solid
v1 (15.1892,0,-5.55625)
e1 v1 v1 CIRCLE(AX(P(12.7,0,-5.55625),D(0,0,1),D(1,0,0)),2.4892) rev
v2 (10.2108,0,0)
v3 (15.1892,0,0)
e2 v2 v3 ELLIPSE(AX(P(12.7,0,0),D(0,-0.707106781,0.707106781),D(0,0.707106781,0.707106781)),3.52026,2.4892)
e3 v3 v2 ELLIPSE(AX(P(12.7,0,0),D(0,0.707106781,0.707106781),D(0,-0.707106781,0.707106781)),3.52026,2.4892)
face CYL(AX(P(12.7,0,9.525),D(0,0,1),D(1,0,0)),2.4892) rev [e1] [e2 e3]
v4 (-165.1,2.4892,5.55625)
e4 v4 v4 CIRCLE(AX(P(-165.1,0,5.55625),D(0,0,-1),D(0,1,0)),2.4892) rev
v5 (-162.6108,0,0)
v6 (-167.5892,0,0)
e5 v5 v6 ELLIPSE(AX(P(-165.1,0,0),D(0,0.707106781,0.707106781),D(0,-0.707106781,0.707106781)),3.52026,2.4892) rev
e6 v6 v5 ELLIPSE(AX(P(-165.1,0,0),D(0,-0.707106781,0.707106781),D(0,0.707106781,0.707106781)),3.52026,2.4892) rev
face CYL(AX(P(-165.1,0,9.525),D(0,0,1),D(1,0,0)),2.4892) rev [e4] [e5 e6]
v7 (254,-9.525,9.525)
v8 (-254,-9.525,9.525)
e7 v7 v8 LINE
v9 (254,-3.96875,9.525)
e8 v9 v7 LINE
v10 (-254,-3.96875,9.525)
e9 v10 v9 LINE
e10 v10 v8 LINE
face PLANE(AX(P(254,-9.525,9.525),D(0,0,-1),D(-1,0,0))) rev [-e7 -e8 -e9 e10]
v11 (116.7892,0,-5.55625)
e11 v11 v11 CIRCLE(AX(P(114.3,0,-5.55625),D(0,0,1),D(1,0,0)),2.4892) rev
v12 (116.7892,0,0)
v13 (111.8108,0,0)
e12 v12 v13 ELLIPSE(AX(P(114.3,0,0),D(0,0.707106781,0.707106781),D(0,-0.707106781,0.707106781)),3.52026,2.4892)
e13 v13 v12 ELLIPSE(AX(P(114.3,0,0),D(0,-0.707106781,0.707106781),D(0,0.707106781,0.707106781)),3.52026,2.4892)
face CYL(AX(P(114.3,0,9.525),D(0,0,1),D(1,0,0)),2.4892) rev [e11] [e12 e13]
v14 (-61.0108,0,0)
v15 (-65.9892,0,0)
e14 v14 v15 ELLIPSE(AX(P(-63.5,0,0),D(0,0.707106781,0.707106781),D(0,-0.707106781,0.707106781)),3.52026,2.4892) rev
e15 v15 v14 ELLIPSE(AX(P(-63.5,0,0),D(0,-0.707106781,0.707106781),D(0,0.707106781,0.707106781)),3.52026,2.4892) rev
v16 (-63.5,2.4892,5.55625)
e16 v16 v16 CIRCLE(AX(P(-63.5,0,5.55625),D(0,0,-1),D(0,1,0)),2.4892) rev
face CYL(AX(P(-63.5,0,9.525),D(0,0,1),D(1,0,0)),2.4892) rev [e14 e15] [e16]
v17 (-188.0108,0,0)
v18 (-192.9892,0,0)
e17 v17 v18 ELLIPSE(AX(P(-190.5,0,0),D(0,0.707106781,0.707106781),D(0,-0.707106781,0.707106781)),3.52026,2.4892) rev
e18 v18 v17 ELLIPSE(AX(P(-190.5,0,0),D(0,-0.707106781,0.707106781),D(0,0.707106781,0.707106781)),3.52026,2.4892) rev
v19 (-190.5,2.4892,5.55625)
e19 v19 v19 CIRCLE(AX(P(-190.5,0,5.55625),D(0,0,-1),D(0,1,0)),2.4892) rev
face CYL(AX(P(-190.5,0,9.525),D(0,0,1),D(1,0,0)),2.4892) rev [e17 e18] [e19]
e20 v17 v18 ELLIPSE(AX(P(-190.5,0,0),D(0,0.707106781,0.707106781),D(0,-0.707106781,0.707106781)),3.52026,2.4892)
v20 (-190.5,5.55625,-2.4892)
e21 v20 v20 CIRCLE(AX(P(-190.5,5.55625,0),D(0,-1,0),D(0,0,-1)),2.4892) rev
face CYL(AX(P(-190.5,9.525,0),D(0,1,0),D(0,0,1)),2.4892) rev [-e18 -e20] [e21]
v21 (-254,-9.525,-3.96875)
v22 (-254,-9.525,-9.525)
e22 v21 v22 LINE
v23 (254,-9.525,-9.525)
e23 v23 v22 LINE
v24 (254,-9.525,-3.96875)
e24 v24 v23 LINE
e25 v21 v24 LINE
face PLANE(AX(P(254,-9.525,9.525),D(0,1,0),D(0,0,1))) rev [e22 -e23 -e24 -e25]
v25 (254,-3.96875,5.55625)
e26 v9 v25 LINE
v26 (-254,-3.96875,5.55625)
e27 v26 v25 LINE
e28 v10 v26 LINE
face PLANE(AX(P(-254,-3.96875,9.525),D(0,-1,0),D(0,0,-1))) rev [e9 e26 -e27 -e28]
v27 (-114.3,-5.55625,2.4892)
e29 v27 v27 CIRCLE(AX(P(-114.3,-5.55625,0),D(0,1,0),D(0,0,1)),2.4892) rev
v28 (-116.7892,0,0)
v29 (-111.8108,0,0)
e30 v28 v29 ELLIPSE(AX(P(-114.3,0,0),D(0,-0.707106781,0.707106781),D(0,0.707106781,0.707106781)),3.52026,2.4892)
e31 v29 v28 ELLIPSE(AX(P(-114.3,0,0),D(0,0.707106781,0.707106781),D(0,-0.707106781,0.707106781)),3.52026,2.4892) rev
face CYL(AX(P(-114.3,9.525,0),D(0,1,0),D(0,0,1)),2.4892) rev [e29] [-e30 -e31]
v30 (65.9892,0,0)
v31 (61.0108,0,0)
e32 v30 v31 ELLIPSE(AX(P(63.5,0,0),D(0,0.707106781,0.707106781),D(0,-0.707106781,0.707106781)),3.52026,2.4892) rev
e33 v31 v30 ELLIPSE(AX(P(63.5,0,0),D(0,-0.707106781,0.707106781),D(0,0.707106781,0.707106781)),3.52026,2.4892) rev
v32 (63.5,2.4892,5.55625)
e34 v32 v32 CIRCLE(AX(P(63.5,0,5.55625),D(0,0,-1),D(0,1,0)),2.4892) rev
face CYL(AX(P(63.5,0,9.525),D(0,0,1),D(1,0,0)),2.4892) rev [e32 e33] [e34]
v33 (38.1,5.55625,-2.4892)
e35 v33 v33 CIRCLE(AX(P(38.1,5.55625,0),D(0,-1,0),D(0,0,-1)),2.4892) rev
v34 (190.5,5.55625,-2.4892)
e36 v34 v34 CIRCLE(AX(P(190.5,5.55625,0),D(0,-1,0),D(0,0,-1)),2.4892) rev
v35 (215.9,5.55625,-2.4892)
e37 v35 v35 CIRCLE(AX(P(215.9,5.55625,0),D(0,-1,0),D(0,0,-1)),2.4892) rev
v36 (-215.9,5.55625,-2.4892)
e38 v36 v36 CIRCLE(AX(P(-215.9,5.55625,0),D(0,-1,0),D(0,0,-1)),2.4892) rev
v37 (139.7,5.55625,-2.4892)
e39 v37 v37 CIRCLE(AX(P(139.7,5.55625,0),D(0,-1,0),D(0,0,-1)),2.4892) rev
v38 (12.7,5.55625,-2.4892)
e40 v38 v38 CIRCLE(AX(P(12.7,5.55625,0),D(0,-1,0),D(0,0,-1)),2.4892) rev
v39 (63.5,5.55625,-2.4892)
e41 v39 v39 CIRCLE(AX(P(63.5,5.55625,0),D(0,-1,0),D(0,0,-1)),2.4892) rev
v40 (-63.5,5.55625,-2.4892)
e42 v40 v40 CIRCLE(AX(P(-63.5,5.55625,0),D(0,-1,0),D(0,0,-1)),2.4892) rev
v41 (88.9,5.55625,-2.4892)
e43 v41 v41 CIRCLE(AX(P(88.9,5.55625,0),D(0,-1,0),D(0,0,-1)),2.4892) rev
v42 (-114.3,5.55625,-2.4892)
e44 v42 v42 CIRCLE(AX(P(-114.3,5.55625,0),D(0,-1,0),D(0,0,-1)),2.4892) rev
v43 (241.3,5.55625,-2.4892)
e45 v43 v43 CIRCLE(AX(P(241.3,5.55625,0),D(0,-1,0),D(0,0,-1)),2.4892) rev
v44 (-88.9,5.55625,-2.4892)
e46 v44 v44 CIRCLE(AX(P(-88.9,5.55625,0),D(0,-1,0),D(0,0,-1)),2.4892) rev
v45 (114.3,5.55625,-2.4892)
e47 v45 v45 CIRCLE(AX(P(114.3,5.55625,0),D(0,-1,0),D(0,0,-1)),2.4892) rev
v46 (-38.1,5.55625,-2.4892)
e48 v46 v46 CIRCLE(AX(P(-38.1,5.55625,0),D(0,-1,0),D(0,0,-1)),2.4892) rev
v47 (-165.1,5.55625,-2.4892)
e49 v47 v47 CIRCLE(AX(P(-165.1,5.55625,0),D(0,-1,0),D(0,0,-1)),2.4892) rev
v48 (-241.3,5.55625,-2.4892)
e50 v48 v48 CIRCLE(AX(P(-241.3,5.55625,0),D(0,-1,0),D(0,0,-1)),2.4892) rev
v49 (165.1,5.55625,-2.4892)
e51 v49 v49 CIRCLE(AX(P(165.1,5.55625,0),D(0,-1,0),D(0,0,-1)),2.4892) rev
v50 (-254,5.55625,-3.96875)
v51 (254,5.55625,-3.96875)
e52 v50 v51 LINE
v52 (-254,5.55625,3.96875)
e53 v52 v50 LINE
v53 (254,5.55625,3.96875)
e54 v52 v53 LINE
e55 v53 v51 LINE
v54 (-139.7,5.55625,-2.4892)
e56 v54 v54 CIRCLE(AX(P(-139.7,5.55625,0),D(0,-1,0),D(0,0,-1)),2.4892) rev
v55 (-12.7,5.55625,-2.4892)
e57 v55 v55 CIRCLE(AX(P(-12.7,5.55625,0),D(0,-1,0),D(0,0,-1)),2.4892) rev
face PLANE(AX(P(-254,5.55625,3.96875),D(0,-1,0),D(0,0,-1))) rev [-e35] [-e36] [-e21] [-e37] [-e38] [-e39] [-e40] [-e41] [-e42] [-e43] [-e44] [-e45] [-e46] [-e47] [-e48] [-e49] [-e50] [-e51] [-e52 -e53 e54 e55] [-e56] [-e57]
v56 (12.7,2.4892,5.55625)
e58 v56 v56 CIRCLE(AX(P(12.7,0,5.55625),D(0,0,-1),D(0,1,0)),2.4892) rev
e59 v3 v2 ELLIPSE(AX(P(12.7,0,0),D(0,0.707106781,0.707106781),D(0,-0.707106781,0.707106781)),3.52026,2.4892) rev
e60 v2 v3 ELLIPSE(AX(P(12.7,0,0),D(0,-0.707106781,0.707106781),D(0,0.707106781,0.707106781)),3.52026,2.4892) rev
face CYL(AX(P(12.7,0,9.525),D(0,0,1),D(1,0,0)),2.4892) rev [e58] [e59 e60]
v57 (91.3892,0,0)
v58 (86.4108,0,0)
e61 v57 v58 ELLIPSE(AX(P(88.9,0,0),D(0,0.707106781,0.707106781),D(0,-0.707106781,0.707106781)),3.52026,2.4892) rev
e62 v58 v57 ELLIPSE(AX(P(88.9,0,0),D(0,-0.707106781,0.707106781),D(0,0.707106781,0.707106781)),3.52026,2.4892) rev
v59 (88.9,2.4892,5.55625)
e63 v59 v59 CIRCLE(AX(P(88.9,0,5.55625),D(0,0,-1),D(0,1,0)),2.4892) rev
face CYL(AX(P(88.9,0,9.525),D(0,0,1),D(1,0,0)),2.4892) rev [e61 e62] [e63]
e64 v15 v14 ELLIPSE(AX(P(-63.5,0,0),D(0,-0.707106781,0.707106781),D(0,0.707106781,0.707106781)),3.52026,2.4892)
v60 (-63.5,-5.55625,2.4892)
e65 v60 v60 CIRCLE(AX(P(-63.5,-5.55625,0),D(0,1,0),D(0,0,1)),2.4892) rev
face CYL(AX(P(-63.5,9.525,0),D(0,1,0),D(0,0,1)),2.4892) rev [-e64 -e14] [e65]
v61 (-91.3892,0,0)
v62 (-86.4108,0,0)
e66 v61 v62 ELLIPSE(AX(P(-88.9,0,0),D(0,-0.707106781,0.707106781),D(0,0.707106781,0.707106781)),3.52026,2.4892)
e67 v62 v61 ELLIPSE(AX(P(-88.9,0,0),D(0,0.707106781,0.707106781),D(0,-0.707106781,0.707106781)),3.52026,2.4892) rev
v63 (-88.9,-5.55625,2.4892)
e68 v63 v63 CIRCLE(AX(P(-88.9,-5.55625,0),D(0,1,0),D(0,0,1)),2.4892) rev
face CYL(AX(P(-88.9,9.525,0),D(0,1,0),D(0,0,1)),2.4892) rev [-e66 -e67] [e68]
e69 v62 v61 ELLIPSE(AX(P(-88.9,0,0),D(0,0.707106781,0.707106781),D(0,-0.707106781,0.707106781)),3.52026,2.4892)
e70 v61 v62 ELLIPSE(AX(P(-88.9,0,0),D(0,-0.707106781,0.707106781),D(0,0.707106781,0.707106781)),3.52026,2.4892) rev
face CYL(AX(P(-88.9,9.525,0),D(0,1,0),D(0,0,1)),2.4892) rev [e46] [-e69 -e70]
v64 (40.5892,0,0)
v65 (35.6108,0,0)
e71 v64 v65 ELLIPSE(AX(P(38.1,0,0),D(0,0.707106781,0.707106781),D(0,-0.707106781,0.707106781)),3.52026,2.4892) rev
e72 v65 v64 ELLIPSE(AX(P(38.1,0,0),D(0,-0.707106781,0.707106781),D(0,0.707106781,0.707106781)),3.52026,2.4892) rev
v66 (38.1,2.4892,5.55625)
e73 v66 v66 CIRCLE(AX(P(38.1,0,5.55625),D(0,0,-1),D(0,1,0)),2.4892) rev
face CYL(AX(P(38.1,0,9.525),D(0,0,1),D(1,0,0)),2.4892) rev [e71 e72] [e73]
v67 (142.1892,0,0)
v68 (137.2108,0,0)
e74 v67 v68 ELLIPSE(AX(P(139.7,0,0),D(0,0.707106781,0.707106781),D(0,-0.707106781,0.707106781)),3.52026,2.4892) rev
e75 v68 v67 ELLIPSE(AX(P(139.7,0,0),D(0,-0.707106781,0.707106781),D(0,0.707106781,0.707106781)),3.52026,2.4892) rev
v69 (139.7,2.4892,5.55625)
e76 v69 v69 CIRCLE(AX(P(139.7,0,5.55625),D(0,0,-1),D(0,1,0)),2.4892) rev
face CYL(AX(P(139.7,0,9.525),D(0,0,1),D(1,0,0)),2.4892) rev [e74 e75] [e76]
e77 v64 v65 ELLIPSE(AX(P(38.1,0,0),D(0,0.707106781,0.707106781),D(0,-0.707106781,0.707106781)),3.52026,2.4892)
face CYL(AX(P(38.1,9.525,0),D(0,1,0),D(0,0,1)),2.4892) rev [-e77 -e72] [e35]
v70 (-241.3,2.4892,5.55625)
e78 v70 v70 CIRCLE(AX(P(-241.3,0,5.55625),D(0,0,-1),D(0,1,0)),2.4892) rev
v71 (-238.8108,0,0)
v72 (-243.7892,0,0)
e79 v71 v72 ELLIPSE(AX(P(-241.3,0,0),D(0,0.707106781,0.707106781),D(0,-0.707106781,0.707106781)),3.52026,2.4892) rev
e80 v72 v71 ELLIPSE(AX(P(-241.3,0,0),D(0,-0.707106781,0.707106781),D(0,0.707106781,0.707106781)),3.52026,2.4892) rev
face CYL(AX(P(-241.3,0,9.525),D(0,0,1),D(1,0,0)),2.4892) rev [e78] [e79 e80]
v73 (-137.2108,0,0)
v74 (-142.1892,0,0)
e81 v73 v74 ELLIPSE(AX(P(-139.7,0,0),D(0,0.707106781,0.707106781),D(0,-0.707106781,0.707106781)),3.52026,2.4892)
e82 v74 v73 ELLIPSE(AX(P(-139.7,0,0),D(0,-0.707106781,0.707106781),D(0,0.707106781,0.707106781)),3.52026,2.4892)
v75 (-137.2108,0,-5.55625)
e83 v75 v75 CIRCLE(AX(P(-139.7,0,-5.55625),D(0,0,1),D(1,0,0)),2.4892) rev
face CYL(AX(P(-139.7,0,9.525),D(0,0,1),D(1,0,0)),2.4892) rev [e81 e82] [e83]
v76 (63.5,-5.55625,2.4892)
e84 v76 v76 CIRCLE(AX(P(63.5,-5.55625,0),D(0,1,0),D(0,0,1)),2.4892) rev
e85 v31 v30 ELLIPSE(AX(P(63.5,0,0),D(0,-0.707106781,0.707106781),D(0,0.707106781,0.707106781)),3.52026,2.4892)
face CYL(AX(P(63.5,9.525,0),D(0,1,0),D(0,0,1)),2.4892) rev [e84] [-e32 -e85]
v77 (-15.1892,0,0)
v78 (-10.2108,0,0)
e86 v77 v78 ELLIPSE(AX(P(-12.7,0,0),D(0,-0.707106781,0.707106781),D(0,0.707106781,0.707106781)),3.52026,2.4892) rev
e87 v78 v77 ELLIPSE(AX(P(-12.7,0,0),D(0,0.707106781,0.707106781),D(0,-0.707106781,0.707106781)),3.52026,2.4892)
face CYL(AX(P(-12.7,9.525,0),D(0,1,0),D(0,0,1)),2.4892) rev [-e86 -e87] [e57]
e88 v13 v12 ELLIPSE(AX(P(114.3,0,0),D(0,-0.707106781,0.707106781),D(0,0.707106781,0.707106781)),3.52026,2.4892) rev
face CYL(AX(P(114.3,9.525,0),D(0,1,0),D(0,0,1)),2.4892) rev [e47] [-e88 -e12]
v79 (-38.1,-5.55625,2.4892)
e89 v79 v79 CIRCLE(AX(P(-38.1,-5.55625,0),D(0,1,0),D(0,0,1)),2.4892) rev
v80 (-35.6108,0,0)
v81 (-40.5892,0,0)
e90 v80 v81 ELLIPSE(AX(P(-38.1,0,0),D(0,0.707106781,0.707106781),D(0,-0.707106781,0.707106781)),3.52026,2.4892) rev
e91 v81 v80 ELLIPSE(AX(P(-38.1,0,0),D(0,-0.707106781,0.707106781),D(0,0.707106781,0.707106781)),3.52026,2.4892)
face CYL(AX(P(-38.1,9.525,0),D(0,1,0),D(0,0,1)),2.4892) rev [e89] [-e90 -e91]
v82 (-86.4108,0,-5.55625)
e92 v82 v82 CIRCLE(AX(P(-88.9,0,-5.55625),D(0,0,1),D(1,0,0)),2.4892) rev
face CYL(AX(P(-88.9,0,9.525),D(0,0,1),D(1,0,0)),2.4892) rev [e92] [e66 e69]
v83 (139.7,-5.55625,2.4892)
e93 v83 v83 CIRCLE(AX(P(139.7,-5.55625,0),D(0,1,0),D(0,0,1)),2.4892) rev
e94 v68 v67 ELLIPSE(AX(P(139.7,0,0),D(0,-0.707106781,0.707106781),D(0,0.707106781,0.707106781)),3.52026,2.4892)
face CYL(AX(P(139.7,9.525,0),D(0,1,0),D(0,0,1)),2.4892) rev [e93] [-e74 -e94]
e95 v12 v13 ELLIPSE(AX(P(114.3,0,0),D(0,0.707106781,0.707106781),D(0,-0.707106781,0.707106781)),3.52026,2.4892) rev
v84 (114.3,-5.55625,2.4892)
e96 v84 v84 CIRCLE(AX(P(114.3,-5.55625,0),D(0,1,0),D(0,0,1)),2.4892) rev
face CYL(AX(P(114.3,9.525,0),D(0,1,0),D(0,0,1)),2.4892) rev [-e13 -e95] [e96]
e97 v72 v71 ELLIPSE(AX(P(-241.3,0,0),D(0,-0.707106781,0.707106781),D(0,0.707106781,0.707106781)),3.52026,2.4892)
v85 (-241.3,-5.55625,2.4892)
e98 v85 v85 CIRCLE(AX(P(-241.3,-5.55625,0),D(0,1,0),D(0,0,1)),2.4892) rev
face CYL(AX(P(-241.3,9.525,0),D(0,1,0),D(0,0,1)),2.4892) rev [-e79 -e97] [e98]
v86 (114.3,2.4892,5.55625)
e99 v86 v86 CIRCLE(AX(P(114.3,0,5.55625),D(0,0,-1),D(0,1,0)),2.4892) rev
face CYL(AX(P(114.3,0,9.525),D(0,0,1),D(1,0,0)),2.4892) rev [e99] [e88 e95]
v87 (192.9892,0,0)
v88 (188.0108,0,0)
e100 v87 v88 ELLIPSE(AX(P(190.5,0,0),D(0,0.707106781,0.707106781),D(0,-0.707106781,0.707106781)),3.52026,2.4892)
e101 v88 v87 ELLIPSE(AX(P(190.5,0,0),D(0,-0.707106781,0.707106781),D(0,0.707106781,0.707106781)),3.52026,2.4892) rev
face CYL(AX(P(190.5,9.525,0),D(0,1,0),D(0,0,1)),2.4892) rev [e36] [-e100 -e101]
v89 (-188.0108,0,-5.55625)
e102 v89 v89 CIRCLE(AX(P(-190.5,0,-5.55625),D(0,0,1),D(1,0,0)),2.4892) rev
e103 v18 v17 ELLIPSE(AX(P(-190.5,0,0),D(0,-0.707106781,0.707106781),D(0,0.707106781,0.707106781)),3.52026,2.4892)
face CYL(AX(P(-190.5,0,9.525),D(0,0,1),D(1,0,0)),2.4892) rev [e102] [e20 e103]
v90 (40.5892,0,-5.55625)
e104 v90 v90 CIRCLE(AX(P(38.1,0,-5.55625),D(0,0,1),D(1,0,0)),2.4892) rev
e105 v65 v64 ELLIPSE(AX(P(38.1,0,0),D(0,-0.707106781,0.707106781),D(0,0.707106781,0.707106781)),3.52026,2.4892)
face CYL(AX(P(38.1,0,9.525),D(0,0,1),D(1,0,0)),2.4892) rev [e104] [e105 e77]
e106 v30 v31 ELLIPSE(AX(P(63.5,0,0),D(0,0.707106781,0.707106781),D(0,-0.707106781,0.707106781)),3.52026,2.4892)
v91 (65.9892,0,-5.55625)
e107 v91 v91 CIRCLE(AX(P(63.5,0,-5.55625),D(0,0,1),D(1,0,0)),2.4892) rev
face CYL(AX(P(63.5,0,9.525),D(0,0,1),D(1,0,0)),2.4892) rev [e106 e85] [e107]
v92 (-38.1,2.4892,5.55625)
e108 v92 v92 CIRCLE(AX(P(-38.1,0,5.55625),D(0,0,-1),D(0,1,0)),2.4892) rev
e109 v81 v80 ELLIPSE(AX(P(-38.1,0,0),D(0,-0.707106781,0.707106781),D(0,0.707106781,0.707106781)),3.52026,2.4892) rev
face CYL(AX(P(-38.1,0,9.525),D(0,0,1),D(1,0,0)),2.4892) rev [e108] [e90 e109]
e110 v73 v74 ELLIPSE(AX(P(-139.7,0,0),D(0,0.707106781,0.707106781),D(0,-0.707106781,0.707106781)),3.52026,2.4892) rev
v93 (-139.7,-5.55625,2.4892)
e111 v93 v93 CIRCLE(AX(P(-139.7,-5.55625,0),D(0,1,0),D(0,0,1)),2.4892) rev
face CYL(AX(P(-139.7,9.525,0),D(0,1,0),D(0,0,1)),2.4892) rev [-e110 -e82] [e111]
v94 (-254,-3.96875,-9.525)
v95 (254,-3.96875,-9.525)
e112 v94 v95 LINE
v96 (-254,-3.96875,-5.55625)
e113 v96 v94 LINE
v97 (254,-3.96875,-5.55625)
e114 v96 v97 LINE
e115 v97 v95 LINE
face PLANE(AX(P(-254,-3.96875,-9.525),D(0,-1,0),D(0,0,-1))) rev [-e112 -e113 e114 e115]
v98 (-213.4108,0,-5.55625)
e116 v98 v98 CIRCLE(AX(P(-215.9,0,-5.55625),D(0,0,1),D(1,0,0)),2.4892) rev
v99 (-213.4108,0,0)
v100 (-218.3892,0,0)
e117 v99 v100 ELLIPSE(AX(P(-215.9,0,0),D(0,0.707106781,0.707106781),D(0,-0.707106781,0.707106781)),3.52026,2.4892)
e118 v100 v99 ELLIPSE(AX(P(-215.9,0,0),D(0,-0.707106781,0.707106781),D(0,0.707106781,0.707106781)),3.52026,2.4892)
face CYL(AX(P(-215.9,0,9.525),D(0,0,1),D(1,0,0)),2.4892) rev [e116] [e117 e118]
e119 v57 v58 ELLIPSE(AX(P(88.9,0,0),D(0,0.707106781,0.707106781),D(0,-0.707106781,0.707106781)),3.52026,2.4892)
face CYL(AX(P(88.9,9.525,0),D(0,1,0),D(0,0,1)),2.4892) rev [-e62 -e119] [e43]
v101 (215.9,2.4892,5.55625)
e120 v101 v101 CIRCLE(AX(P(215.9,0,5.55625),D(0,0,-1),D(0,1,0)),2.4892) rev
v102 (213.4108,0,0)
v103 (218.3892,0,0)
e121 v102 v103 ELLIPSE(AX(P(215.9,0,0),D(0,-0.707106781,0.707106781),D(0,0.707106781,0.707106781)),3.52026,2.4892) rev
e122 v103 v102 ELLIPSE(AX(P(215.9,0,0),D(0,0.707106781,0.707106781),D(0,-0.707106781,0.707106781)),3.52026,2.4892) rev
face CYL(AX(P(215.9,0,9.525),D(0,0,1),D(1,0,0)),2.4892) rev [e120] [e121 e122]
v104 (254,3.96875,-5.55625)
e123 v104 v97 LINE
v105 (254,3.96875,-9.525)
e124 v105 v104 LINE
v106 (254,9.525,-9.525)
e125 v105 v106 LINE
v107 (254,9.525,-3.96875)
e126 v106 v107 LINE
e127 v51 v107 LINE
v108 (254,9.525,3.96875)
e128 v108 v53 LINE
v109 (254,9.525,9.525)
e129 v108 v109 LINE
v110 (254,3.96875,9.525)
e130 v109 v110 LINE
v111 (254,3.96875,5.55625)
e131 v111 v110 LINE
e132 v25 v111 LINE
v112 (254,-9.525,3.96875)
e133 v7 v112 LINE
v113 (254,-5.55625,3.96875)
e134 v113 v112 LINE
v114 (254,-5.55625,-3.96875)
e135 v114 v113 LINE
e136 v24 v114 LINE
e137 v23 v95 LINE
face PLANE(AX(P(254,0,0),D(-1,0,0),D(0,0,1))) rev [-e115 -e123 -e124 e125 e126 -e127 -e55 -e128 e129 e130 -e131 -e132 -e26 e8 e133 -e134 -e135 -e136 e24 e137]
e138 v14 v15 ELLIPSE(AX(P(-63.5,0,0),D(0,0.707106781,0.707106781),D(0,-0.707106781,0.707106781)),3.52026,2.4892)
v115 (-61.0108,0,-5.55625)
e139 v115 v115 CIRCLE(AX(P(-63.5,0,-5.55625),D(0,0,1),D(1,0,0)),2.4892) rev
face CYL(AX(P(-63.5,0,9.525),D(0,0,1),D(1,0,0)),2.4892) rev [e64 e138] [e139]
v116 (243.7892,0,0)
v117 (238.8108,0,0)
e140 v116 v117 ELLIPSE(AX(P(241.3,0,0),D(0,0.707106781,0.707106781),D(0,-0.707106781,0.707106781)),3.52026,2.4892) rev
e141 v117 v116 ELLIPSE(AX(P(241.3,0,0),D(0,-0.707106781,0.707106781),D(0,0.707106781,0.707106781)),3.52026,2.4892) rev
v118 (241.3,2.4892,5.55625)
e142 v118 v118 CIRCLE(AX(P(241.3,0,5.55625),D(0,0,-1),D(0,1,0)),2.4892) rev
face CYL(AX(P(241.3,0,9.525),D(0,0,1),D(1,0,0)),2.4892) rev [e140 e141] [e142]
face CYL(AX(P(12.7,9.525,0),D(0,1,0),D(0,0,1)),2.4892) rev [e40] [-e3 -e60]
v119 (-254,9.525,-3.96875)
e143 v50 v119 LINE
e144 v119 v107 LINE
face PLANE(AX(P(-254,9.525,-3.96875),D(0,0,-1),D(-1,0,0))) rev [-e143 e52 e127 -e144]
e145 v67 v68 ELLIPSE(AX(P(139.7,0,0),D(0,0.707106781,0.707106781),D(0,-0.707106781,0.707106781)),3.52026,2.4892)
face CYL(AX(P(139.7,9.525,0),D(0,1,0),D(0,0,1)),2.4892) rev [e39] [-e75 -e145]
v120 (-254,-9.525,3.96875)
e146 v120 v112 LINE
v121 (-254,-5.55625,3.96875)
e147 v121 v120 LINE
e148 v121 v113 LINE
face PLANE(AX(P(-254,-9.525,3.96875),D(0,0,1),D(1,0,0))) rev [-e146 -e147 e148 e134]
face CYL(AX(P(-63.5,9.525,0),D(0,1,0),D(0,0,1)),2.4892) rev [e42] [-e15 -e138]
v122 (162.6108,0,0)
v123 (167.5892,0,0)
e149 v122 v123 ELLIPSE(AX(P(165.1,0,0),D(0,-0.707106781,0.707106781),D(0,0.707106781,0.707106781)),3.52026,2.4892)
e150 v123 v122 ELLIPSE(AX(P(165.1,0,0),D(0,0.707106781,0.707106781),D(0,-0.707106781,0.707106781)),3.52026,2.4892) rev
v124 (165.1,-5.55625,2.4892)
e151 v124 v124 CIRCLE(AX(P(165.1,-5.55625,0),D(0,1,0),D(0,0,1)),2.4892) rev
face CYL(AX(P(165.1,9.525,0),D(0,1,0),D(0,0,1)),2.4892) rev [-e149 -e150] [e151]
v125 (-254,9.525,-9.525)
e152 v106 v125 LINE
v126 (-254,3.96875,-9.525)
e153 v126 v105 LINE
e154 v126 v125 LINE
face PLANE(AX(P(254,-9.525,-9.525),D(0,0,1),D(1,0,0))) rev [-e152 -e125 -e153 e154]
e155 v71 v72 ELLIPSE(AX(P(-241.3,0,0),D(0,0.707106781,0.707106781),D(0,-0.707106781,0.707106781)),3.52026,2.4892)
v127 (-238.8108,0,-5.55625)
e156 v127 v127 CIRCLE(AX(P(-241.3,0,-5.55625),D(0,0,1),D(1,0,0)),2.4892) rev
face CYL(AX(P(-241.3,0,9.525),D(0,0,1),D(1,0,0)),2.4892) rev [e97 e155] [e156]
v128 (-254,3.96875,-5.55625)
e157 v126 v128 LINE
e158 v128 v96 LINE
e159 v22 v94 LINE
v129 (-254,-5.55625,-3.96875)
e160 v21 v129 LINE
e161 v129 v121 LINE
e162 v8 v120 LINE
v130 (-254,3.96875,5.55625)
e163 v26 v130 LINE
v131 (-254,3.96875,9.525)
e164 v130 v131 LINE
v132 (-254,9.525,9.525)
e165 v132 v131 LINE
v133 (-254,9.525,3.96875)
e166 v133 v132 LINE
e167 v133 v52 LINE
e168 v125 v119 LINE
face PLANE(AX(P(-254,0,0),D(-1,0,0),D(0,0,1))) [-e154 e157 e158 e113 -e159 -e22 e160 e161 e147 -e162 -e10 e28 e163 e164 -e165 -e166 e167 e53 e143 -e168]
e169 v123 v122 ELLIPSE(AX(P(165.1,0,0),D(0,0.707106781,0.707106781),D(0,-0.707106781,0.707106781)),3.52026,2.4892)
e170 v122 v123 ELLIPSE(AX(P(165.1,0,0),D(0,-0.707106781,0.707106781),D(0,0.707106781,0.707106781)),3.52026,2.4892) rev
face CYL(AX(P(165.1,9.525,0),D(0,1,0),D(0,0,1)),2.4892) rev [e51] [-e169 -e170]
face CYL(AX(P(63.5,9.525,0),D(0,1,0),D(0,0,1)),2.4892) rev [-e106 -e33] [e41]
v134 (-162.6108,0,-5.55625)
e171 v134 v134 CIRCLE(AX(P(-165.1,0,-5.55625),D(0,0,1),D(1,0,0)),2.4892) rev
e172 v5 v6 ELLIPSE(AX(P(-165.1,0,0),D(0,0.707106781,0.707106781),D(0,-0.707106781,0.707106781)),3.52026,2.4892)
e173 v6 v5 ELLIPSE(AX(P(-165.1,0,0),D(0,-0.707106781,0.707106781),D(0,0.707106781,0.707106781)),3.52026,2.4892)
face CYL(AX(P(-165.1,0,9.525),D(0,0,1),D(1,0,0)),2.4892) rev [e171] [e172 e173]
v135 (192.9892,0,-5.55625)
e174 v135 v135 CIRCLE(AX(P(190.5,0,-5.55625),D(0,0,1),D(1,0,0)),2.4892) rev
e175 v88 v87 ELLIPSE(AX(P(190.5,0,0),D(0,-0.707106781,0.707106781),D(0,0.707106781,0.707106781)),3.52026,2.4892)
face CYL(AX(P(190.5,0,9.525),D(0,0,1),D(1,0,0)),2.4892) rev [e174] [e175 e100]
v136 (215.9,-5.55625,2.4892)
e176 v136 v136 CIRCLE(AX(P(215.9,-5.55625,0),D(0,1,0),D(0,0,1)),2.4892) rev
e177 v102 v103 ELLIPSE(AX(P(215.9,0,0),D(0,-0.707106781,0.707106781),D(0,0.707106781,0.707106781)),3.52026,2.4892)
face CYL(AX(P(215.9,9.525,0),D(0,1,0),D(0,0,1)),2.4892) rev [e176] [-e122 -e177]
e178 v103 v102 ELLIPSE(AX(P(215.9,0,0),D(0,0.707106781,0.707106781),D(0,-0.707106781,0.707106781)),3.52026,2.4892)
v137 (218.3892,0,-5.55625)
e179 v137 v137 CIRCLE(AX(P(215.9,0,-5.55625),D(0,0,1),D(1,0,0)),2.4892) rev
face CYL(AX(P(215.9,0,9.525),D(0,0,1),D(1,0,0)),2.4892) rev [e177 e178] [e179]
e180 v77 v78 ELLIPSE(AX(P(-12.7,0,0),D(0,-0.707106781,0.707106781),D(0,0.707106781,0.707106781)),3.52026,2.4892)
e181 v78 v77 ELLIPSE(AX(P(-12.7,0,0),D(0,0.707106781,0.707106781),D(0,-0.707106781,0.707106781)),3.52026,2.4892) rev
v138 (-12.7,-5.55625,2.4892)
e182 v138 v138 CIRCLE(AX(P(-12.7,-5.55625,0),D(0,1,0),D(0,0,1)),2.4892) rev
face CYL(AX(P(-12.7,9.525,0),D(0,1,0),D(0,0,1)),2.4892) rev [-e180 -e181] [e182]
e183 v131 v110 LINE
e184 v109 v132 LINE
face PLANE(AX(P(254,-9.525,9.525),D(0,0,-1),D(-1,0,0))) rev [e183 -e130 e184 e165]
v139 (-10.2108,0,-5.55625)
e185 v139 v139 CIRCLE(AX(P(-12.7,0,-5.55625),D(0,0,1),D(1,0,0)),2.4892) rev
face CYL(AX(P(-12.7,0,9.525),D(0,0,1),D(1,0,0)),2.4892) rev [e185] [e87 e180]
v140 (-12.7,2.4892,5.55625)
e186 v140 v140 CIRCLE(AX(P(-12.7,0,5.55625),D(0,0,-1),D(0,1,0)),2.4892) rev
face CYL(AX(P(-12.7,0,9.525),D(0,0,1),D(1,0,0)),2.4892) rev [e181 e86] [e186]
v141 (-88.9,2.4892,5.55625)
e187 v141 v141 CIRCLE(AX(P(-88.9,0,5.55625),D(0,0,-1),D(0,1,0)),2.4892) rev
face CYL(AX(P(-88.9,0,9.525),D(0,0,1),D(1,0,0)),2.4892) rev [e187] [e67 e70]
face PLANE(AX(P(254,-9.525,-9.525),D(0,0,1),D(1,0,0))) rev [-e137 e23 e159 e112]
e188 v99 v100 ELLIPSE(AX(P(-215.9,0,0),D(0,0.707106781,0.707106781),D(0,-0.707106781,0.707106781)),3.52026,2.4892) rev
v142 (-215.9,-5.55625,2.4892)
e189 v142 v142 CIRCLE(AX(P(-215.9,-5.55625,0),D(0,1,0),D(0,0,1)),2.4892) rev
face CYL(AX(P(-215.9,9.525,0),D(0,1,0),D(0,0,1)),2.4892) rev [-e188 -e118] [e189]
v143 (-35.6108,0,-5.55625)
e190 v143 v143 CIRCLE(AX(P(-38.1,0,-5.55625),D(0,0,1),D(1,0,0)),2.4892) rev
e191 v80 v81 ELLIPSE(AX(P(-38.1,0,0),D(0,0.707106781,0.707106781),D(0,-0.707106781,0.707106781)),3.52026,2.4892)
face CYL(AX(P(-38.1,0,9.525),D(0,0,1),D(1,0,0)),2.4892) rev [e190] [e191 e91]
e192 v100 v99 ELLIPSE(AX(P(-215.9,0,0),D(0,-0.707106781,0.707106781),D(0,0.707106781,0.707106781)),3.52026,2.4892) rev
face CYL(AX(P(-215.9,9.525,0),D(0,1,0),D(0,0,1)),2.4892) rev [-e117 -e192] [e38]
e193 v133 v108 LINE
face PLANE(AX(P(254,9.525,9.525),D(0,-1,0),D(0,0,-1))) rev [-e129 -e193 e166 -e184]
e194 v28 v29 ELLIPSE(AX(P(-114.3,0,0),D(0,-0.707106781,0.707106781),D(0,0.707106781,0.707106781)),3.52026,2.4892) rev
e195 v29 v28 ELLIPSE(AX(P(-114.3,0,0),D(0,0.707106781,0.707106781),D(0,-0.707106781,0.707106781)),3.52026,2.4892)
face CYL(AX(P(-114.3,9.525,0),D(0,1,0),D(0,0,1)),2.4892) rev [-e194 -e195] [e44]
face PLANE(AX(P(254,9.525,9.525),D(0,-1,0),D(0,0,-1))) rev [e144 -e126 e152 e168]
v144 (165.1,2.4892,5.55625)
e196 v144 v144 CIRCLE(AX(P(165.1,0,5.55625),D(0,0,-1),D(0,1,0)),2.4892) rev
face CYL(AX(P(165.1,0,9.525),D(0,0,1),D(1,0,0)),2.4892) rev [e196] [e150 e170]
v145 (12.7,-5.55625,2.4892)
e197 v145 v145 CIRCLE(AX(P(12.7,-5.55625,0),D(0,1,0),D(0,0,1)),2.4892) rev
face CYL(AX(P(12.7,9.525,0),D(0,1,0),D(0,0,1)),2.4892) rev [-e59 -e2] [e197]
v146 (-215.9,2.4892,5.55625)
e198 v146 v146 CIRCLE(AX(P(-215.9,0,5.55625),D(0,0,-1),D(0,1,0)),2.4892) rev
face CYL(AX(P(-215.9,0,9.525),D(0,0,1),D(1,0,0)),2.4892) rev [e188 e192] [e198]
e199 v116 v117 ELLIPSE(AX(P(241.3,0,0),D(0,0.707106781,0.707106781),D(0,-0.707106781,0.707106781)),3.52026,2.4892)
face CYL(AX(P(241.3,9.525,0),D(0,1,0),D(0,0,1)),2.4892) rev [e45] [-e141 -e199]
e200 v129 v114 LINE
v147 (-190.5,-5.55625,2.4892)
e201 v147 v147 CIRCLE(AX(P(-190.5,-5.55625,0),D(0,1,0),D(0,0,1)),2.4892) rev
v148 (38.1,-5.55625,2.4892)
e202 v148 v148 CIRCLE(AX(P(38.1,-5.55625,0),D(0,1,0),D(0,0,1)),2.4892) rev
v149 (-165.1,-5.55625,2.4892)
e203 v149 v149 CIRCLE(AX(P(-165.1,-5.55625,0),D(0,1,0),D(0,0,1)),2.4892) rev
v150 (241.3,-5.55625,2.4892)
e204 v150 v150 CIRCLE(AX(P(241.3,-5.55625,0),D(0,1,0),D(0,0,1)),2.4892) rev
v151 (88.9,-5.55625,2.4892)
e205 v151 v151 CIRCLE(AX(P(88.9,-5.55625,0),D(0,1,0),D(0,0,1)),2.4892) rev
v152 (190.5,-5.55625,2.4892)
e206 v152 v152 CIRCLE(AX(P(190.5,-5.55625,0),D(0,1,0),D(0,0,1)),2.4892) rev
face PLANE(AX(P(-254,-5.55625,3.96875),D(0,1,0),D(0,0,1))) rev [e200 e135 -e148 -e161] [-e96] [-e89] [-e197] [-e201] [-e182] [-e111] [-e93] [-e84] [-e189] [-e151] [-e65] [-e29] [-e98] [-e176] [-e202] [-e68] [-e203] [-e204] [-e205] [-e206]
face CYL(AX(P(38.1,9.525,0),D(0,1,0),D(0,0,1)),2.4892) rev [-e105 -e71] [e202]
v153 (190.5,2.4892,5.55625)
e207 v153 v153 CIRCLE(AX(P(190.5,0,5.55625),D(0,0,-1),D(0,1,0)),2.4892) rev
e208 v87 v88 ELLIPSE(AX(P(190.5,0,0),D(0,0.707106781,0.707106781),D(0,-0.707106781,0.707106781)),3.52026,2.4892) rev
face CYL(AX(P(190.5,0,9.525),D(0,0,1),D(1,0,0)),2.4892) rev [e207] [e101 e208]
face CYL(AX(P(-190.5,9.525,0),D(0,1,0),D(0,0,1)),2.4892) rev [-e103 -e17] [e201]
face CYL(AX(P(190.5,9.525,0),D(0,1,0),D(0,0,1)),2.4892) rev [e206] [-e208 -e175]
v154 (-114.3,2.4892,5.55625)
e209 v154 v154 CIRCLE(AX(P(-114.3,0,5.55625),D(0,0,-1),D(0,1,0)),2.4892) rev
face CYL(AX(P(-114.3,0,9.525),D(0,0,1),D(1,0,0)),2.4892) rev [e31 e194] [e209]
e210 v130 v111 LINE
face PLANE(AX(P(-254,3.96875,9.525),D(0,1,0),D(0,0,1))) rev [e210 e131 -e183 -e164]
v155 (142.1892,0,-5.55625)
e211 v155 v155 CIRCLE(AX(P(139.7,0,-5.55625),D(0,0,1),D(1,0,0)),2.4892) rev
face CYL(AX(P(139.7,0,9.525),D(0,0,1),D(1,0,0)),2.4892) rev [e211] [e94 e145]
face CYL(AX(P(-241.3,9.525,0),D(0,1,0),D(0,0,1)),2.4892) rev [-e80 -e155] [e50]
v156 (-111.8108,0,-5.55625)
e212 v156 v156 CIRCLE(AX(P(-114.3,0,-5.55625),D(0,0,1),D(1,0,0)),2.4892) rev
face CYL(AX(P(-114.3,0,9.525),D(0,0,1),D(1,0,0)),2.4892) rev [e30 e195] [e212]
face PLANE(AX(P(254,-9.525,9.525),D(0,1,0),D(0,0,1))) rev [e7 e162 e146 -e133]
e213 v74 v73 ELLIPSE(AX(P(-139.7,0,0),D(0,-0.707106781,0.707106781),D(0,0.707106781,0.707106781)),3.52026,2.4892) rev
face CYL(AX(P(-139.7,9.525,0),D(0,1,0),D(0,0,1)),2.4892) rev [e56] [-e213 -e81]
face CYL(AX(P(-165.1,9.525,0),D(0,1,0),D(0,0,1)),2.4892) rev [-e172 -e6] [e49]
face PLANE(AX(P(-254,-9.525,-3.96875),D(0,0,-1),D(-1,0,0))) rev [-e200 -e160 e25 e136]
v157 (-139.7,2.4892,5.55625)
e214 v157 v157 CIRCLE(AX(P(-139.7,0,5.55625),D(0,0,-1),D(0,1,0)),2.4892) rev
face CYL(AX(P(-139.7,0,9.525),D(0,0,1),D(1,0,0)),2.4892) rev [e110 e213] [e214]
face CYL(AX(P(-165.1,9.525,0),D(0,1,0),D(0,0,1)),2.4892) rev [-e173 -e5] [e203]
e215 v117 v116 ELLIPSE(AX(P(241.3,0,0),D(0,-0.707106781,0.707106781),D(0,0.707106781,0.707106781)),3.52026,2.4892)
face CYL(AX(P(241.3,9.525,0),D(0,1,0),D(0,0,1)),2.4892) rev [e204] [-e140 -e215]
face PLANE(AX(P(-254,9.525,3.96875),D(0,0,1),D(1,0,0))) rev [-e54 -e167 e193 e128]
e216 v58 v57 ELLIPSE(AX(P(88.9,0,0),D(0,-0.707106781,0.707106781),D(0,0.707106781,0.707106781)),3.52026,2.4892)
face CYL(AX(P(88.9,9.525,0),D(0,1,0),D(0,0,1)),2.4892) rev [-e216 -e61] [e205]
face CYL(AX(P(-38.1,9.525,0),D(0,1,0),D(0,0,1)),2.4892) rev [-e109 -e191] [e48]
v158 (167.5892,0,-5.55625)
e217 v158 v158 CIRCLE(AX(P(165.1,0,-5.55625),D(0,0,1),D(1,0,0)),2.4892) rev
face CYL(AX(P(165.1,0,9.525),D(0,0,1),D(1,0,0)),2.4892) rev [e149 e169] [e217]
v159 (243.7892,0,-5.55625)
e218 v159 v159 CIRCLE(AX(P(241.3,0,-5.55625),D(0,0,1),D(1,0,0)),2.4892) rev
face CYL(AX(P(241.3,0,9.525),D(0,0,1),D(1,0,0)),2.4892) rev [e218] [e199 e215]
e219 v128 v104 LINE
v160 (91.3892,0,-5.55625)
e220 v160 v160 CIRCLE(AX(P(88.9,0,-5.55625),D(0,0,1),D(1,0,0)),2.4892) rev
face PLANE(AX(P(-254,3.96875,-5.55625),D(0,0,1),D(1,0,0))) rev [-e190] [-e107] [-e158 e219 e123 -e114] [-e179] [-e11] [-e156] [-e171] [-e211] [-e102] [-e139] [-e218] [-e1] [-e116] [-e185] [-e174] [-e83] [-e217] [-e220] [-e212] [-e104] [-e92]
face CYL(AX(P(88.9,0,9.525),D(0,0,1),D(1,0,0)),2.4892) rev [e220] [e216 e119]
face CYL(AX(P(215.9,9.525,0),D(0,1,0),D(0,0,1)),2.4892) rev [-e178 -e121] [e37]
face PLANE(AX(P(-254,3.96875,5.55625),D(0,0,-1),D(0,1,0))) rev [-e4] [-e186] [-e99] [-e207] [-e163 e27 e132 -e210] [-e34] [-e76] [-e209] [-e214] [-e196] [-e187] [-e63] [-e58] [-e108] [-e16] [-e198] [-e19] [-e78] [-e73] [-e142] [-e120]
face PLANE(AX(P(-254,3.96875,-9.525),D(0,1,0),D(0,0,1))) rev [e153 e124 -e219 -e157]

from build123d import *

# Parameters (mm, degrees)
SKETCH1_W             = 19.05
SKETCH1_H             = 19.05
BOSS_EXTRUDE1_DEPTH   = 254
SKETCH3_W             = 2.4892
SKETCH3_H             = 19.05
SKETCH3_AT_POINT_2_W  = 2.4892
SKETCH3_AT_POINT_2_H  = 19.05
LPATTERN1_START       = -11
LPATTERN1_OUTLINE_R   = 2.4892
LPATTERN1_DEPTH       = 22
LPATTERN1_2_OUTLINE_R = 2.4892
LPATTERN1_2_DEPTH     = 22
SKETCH4_W             = 3.96875
SKETCH4_H             = 7.9375
SKETCH4_W_2           = 7.9375
SKETCH4_H_2           = 3.96875
CUT_EXTRUDE1_DEPTH    = 509.178562368


with BuildPart() as part:
    # Sketch1 → Boss-Extrude1 (new, symmetric)
    with BuildSketch(Plane(origin=(0, 0, 0), x_dir=(0, 0, -1), z_dir=(1, 0, 0))):
        Rectangle(SKETCH1_W, SKETCH1_H)
    extrude(amount=BOSS_EXTRUDE1_DEPTH, both=True)

    # Sketch3 → #9 (0.196) Diameter Hole1 (revolve, cut)
    with BuildSketch(Plane(origin=(241.3, 9.525, 0), x_dir=(0, 0, 1), z_dir=(1, 0, 0))):
        with Locations((1.2446, 9.525)):
            Rectangle(SKETCH3_W, SKETCH3_H)
    revolve(axis=Axis((241.3, 15.875, 0), (0, -1, 0)), mode=Mode.SUBTRACT)

    # Sketch3 at point 2 (carried to point 2, square into its face) → #9 (0.196) Diameter Hole1 at 2 (revolve, cut)
    with BuildSketch(Plane(origin=(241.3, 0, 9.525), x_dir=(0, -1, 0), z_dir=(1, 0, 0))):
        with Locations((1.2446, 9.525)):
            Rectangle(SKETCH3_AT_POINT_2_W, SKETCH3_AT_POINT_2_H)
    revolve(axis=Axis((241.3, 0, 15.875), (0, 0, -1)), mode=Mode.SUBTRACT)

    # LPattern1: read off the stored shape, not the designer's step
    # LPattern1 outline → LPattern1 (cut)
    with BuildSketch(Plane.XY.offset(LPATTERN1_START)):
        with Locations((-241.3, 0)):
            Circle(LPATTERN1_OUTLINE_R)
        with Locations((-215.9, 0)):
            Circle(LPATTERN1_OUTLINE_R)
        with Locations((-190.5, 0)):
            Circle(LPATTERN1_OUTLINE_R)
        with Locations((-165.1, 0)):
            Circle(LPATTERN1_OUTLINE_R)
        with Locations((-139.7, 0)):
            Circle(LPATTERN1_OUTLINE_R)
        with Locations((-114.3, 0)):
            Circle(LPATTERN1_OUTLINE_R)
        with Locations((-88.9, 0)):
            Circle(LPATTERN1_OUTLINE_R)
        with Locations((-63.5, 0)):
            Circle(LPATTERN1_OUTLINE_R)
        with Locations((-38.1, 0)):
            Circle(LPATTERN1_OUTLINE_R)
        with Locations((-12.7, 0)):
            Circle(LPATTERN1_OUTLINE_R)
        with Locations((12.7, 0)):
            Circle(LPATTERN1_OUTLINE_R)
        with Locations((38.1, 0)):
            Circle(LPATTERN1_OUTLINE_R)
        with Locations((63.5, 0)):
            Circle(LPATTERN1_OUTLINE_R)
        with Locations((88.9, 0)):
            Circle(LPATTERN1_OUTLINE_R)
        with Locations((114.3, 0)):
            Circle(LPATTERN1_OUTLINE_R)
        with Locations((139.7, 0)):
            Circle(LPATTERN1_OUTLINE_R)
        with Locations((165.1, 0)):
            Circle(LPATTERN1_OUTLINE_R)
        with Locations((190.5, 0)):
            Circle(LPATTERN1_OUTLINE_R)
        with Locations((215.9, 0)):
            Circle(LPATTERN1_OUTLINE_R)
    extrude(amount=LPATTERN1_DEPTH, mode=Mode.SUBTRACT)

    # LPattern1 2 outline → LPattern1 2 (cut)
    with BuildSketch(Plane(origin=(0, 0, 0), x_dir=(1, 0, 0), z_dir=(0, 1, 0)).offset(LPATTERN1_START)):
        with Locations((215.9, 0)):
            Circle(LPATTERN1_2_OUTLINE_R)
        with Locations((190.5, 0)):
            Circle(LPATTERN1_2_OUTLINE_R)
        with Locations((165.1, 0)):
            Circle(LPATTERN1_2_OUTLINE_R)
        with Locations((139.7, 0)):
            Circle(LPATTERN1_2_OUTLINE_R)
        with Locations((114.3, 0)):
            Circle(LPATTERN1_2_OUTLINE_R)
        with Locations((88.9, 0)):
            Circle(LPATTERN1_2_OUTLINE_R)
        with Locations((63.5, 0)):
            Circle(LPATTERN1_2_OUTLINE_R)
        with Locations((38.1, 0)):
            Circle(LPATTERN1_2_OUTLINE_R)
        with Locations((12.7, 0)):
            Circle(LPATTERN1_2_OUTLINE_R)
        with Locations((-12.7, 0)):
            Circle(LPATTERN1_2_OUTLINE_R)
        with Locations((-38.1, 0)):
            Circle(LPATTERN1_2_OUTLINE_R)
        with Locations((-63.5, 0)):
            Circle(LPATTERN1_2_OUTLINE_R)
        with Locations((-88.9, 0)):
            Circle(LPATTERN1_2_OUTLINE_R)
        with Locations((-114.3, 0)):
            Circle(LPATTERN1_2_OUTLINE_R)
        with Locations((-139.7, 0)):
            Circle(LPATTERN1_2_OUTLINE_R)
        with Locations((-165.1, 0)):
            Circle(LPATTERN1_2_OUTLINE_R)
        with Locations((-190.5, 0)):
            Circle(LPATTERN1_2_OUTLINE_R)
        with Locations((-215.9, 0)):
            Circle(LPATTERN1_2_OUTLINE_R)
        with Locations((-241.3, 0)):
            Circle(LPATTERN1_2_OUTLINE_R)
    extrude(amount=LPATTERN1_2_DEPTH, mode=Mode.SUBTRACT)

    # Sketch4 → Cut-Extrude1 (cut, through all)
    with BuildSketch(Plane(origin=(254, 0, 0), x_dir=(0, 0, -1), z_dir=(1, 0, 0))):
        with Locations((-7.540625, 0)):
            Rectangle(SKETCH4_W, SKETCH4_H)
        with Locations((0, 7.540625)):
            Rectangle(SKETCH4_W_2, SKETCH4_H_2)
        with Locations((7.540625, 0)):
            Rectangle(SKETCH4_W, SKETCH4_H)
        with Locations((0, -7.540625)):
            Rectangle(SKETCH4_W_2, SKETCH4_H_2)
    extrude(amount=-CUT_EXTRUDE1_DEPTH, mode=Mode.SUBTRACT)


solid = part.part
